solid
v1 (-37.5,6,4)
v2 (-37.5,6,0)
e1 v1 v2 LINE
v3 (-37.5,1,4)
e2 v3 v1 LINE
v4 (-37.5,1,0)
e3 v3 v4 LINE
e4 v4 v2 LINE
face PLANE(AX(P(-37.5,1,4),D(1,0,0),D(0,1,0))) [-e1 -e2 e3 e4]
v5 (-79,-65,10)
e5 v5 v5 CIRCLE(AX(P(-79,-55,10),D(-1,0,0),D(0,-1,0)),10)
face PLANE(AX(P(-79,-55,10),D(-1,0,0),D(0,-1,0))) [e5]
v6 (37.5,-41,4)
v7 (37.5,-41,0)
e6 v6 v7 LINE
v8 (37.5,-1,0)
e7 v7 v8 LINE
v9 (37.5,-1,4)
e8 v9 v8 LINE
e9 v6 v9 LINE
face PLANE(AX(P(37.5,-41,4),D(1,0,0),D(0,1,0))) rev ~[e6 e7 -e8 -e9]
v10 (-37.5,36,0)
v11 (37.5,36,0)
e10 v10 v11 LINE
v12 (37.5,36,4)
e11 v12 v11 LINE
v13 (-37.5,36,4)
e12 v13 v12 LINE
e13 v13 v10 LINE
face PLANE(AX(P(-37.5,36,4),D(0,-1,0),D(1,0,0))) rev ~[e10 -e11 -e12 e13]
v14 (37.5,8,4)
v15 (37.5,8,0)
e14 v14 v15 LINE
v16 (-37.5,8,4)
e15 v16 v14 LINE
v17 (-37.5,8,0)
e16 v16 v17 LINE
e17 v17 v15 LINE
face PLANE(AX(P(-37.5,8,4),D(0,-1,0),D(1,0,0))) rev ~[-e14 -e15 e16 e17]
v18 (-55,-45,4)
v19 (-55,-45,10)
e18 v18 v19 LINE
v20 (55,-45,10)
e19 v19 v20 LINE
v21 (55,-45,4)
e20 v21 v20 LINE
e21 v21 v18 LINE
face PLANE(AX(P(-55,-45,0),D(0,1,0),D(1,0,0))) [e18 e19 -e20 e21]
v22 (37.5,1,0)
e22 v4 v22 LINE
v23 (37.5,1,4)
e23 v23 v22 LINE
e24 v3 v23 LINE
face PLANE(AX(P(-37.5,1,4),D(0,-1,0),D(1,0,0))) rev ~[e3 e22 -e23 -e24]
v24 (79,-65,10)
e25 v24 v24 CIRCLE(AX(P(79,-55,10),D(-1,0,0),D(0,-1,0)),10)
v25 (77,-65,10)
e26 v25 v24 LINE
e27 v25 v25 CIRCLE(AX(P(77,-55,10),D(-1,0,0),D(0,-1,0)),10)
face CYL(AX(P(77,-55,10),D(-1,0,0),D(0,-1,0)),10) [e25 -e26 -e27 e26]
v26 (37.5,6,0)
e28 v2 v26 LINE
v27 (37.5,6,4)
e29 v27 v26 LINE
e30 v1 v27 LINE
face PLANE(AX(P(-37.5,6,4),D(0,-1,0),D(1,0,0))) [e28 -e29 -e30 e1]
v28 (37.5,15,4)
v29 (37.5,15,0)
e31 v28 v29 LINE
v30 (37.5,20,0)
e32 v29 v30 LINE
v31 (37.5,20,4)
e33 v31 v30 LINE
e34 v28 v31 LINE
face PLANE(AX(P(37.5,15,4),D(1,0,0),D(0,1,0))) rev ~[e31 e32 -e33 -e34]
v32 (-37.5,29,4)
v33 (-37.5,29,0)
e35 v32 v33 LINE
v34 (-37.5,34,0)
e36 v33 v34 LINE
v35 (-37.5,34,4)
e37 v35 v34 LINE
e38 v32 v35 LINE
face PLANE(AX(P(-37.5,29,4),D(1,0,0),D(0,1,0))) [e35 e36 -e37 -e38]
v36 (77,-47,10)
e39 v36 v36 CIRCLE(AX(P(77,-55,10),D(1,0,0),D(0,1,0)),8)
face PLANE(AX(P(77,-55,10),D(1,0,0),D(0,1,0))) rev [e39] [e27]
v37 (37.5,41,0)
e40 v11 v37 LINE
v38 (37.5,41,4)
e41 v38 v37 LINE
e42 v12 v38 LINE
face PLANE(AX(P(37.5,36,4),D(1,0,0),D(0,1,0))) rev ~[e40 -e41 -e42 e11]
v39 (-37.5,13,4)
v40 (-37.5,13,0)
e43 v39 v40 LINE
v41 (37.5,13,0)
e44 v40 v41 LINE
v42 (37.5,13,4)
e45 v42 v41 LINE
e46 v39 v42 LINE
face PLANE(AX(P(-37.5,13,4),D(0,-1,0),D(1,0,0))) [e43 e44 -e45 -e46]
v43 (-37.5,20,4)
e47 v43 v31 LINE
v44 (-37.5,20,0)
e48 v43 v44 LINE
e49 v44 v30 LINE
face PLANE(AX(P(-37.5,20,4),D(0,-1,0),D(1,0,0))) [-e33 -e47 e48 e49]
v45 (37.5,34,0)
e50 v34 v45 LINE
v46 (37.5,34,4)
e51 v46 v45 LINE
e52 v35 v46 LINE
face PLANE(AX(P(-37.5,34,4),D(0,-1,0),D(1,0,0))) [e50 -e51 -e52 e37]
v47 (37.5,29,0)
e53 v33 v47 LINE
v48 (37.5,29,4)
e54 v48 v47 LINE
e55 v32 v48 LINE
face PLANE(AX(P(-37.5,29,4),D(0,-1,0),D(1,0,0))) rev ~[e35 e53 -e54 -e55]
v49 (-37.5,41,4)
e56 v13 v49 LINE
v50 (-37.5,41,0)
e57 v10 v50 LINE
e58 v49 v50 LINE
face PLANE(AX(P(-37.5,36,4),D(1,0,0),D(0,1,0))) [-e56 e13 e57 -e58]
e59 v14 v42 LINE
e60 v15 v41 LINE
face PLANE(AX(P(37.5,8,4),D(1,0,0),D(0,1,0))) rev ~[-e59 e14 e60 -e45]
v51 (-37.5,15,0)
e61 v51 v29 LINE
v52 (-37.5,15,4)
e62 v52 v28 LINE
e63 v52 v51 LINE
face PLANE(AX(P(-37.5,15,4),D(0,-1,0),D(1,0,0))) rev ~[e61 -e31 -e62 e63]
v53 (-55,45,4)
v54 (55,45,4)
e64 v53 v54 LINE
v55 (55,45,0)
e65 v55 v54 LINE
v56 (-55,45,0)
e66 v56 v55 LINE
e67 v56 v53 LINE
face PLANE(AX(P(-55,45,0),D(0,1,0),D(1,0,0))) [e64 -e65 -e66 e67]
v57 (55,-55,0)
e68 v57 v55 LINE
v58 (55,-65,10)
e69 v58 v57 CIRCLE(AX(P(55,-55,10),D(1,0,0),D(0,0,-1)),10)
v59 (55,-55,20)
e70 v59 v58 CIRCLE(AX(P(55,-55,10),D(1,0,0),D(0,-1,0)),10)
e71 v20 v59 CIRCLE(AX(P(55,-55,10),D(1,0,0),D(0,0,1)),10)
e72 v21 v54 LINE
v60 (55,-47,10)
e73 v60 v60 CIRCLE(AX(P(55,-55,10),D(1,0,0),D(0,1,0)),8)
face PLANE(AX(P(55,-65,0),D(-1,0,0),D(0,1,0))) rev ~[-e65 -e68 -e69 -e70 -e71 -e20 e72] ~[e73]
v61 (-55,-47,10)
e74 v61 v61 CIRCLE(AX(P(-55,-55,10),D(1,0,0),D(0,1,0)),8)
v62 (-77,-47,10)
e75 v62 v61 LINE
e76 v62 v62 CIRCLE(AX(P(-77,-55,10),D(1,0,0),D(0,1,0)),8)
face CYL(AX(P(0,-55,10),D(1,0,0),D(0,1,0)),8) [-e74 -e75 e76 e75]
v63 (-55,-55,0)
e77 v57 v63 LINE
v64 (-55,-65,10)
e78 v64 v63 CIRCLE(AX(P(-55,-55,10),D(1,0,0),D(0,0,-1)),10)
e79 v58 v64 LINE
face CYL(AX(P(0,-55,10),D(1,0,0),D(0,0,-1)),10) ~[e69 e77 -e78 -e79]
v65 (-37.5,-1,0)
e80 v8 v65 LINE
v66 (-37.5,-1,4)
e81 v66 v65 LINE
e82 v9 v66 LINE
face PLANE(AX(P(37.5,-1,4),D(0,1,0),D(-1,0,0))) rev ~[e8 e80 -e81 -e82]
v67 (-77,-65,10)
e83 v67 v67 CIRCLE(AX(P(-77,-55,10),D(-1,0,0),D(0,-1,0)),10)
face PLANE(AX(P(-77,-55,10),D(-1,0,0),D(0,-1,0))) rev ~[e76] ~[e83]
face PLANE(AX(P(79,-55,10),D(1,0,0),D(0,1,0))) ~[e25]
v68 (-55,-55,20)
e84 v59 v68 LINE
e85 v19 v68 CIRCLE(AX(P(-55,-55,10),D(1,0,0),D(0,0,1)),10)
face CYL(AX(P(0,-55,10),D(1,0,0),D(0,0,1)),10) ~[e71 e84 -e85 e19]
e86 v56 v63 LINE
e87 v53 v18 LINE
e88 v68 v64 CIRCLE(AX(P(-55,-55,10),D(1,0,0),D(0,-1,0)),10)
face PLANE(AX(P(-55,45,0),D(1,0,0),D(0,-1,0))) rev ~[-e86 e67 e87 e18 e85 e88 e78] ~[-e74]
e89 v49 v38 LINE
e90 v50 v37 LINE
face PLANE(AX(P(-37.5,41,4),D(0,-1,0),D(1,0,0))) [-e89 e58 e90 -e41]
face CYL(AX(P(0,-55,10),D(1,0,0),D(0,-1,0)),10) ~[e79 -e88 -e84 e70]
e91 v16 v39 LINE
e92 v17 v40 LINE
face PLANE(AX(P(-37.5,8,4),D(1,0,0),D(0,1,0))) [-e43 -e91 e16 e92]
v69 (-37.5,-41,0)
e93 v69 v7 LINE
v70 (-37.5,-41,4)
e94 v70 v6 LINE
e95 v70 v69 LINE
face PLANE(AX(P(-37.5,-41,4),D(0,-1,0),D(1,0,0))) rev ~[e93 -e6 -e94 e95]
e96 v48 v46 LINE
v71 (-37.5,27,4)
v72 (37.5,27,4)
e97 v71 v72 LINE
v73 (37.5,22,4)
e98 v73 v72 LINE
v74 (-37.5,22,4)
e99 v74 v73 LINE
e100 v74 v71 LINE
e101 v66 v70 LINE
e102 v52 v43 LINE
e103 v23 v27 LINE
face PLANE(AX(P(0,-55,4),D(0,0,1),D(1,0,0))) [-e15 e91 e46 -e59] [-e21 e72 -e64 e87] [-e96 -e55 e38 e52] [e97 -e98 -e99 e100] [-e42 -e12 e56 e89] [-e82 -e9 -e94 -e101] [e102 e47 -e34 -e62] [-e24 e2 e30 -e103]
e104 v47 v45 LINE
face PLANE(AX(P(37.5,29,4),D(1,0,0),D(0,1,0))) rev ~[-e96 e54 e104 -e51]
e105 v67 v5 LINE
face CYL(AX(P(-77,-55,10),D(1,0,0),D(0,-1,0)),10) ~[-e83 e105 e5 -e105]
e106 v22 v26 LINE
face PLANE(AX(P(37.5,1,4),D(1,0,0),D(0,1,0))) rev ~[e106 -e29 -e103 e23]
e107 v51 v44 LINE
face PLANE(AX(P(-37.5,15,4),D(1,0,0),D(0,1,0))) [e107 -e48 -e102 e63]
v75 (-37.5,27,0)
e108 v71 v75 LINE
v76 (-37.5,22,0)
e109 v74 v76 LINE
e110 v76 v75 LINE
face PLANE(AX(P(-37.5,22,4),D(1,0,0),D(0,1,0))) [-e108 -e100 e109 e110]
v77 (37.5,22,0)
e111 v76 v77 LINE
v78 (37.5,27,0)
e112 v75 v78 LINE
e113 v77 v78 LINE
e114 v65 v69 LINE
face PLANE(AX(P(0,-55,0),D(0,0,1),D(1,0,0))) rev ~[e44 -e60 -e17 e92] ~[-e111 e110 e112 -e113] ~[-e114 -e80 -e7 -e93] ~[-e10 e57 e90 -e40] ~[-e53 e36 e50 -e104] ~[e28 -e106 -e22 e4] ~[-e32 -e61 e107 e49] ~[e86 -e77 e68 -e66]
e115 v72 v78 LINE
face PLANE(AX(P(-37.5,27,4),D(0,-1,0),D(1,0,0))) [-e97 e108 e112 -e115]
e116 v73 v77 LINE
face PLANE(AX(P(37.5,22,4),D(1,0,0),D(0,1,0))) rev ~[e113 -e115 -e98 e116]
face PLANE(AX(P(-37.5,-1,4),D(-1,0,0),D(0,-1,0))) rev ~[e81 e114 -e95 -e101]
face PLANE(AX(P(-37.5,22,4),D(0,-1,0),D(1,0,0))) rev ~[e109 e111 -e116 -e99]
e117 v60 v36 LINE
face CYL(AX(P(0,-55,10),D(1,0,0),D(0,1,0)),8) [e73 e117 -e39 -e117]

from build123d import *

# Parameters (mm, degrees)
F0_W     = 110
F0_H     = 20
F0_H_2   = 90
F1_DEPTH = 4
F2_DEPTH = 20
F4_DEPTH = 100
F3_R     = 8
F5_DEPTH = 77
F6_R     = 10
F6_R_2   = 8
F7_DEPTH = 2
F8_W     = 75
F8_H     = 5
F9_DEPTH = 25


# Not quite as in the source:
# - a pattern or mirror of a feature is missing from the dataset's text; its kind, count and spacing are read off the source's solid
# - a feature names something its author has since deleted; it is built from what else it names


with BuildPart() as f1:
    # F0 (on Top) → F1 (new body)
    with BuildSketch(Plane.XY):
        with Locations((0, -55)):
            Rectangle(F0_W, F0_H)
        Rectangle(F0_W, F0_H_2)
    extrude(amount=F1_DEPTH)

    # F0 (on Top) → F2 (join)
    with BuildSketch(Plane.XY):
        with Locations((0, -55)):
            Rectangle(F0_W, F0_H)
    extrude(amount=F2_DEPTH)

    # F3 (on Right) → F4 (cut, symmetric)
    with BuildSketch(Plane.YZ):
        with BuildLine():
            Line((-65, 2), (-65, 0))
            Line((-65, 0), (-55, 0))
            ThreePointArc((-55, 0), (-62.0710678119, 2.9289321881), (-65, 10))
            Line((-65, 10), (-65, 2))
        make_face()
        with BuildLine():
            Line((-65, 20), (-65, 10))
            ThreePointArc((-65, 10), (-62.0710678119, 17.0710678119), (-55, 20))
            Line((-55, 20), (-65, 20))
        make_face()
        with BuildLine():
            ThreePointArc((-55, 20), (-47.9289321881, 17.0710678119), (-45, 10))
            Line((-45, 10), (-45, 20))
            Line((-45, 20), (-55, 20))
        make_face()
    extrude(amount=F4_DEPTH, both=True, mode=Mode.SUBTRACT)

    # F3 (on Right) → F5 (join, symmetric)
    with BuildSketch(Plane.YZ):
        with Locations((-55, 10)):
            Circle(F3_R)
    extrude(amount=F5_DEPTH, both=True)

    # F6 (on face) → F7 (join)
    with BuildSketch(Plane(origin=(-77, 0, 0), x_dir=(0, -1, 0), z_dir=(-1, 0, 0))):
        with Locations((55, 10)):
            Circle(F6_R)
        with Locations((55, 10)):
            Circle(F6_R_2, mode=Mode.SUBTRACT)
        with Locations((55, 10)):
            Circle(F6_R_2)
    f7 = extrude(amount=F7_DEPTH)

    # F7_copies: F7 across plane
    add(f7.mirror(Plane(origin=(0, 0, 0), x_dir=(0, 0, 1), z_dir=(1, 0, 0))))

    # F8 (on face) → F9 (cut)
    with BuildSketch(Plane.XY.offset(4)):
        with Locations((0, 3.5)):
            Rectangle(F8_W, F8_H)
        with Locations((0, 10.5)):
            Rectangle(F8_W, F8_H)
        with Locations((0, 31.5)):
            Rectangle(F8_W, F8_H)
        with Locations((0, 24.5)):
            Rectangle(F8_W, F8_H)
        with Locations((0, 17.5)):
            Rectangle(F8_W, F8_H)
        with Locations((0, 38.5)):
            Rectangle(F8_W, F8_H)
        Polygon((37.5, -8), (37.5, -6), (37.5, -1), (-37.5, -1), (-37.5, -6), (-37.5, -8), (-37.5, -13), (-37.5, -15), (-37.5, -20), (-37.5, -22), (-37.5, -27), (-37.5, -29), (-37.5, -34), (-37.5, -36), (-37.5, -41), (37.5, -41), (37.5, -36), (37.5, -34), (37.5, -29), (37.5, -27), (37.5, -22), (37.5, -20), (37.5, -15), (37.5, -13), align=None)
    extrude(amount=-F9_DEPTH, mode=Mode.SUBTRACT)


solid = f1.part
